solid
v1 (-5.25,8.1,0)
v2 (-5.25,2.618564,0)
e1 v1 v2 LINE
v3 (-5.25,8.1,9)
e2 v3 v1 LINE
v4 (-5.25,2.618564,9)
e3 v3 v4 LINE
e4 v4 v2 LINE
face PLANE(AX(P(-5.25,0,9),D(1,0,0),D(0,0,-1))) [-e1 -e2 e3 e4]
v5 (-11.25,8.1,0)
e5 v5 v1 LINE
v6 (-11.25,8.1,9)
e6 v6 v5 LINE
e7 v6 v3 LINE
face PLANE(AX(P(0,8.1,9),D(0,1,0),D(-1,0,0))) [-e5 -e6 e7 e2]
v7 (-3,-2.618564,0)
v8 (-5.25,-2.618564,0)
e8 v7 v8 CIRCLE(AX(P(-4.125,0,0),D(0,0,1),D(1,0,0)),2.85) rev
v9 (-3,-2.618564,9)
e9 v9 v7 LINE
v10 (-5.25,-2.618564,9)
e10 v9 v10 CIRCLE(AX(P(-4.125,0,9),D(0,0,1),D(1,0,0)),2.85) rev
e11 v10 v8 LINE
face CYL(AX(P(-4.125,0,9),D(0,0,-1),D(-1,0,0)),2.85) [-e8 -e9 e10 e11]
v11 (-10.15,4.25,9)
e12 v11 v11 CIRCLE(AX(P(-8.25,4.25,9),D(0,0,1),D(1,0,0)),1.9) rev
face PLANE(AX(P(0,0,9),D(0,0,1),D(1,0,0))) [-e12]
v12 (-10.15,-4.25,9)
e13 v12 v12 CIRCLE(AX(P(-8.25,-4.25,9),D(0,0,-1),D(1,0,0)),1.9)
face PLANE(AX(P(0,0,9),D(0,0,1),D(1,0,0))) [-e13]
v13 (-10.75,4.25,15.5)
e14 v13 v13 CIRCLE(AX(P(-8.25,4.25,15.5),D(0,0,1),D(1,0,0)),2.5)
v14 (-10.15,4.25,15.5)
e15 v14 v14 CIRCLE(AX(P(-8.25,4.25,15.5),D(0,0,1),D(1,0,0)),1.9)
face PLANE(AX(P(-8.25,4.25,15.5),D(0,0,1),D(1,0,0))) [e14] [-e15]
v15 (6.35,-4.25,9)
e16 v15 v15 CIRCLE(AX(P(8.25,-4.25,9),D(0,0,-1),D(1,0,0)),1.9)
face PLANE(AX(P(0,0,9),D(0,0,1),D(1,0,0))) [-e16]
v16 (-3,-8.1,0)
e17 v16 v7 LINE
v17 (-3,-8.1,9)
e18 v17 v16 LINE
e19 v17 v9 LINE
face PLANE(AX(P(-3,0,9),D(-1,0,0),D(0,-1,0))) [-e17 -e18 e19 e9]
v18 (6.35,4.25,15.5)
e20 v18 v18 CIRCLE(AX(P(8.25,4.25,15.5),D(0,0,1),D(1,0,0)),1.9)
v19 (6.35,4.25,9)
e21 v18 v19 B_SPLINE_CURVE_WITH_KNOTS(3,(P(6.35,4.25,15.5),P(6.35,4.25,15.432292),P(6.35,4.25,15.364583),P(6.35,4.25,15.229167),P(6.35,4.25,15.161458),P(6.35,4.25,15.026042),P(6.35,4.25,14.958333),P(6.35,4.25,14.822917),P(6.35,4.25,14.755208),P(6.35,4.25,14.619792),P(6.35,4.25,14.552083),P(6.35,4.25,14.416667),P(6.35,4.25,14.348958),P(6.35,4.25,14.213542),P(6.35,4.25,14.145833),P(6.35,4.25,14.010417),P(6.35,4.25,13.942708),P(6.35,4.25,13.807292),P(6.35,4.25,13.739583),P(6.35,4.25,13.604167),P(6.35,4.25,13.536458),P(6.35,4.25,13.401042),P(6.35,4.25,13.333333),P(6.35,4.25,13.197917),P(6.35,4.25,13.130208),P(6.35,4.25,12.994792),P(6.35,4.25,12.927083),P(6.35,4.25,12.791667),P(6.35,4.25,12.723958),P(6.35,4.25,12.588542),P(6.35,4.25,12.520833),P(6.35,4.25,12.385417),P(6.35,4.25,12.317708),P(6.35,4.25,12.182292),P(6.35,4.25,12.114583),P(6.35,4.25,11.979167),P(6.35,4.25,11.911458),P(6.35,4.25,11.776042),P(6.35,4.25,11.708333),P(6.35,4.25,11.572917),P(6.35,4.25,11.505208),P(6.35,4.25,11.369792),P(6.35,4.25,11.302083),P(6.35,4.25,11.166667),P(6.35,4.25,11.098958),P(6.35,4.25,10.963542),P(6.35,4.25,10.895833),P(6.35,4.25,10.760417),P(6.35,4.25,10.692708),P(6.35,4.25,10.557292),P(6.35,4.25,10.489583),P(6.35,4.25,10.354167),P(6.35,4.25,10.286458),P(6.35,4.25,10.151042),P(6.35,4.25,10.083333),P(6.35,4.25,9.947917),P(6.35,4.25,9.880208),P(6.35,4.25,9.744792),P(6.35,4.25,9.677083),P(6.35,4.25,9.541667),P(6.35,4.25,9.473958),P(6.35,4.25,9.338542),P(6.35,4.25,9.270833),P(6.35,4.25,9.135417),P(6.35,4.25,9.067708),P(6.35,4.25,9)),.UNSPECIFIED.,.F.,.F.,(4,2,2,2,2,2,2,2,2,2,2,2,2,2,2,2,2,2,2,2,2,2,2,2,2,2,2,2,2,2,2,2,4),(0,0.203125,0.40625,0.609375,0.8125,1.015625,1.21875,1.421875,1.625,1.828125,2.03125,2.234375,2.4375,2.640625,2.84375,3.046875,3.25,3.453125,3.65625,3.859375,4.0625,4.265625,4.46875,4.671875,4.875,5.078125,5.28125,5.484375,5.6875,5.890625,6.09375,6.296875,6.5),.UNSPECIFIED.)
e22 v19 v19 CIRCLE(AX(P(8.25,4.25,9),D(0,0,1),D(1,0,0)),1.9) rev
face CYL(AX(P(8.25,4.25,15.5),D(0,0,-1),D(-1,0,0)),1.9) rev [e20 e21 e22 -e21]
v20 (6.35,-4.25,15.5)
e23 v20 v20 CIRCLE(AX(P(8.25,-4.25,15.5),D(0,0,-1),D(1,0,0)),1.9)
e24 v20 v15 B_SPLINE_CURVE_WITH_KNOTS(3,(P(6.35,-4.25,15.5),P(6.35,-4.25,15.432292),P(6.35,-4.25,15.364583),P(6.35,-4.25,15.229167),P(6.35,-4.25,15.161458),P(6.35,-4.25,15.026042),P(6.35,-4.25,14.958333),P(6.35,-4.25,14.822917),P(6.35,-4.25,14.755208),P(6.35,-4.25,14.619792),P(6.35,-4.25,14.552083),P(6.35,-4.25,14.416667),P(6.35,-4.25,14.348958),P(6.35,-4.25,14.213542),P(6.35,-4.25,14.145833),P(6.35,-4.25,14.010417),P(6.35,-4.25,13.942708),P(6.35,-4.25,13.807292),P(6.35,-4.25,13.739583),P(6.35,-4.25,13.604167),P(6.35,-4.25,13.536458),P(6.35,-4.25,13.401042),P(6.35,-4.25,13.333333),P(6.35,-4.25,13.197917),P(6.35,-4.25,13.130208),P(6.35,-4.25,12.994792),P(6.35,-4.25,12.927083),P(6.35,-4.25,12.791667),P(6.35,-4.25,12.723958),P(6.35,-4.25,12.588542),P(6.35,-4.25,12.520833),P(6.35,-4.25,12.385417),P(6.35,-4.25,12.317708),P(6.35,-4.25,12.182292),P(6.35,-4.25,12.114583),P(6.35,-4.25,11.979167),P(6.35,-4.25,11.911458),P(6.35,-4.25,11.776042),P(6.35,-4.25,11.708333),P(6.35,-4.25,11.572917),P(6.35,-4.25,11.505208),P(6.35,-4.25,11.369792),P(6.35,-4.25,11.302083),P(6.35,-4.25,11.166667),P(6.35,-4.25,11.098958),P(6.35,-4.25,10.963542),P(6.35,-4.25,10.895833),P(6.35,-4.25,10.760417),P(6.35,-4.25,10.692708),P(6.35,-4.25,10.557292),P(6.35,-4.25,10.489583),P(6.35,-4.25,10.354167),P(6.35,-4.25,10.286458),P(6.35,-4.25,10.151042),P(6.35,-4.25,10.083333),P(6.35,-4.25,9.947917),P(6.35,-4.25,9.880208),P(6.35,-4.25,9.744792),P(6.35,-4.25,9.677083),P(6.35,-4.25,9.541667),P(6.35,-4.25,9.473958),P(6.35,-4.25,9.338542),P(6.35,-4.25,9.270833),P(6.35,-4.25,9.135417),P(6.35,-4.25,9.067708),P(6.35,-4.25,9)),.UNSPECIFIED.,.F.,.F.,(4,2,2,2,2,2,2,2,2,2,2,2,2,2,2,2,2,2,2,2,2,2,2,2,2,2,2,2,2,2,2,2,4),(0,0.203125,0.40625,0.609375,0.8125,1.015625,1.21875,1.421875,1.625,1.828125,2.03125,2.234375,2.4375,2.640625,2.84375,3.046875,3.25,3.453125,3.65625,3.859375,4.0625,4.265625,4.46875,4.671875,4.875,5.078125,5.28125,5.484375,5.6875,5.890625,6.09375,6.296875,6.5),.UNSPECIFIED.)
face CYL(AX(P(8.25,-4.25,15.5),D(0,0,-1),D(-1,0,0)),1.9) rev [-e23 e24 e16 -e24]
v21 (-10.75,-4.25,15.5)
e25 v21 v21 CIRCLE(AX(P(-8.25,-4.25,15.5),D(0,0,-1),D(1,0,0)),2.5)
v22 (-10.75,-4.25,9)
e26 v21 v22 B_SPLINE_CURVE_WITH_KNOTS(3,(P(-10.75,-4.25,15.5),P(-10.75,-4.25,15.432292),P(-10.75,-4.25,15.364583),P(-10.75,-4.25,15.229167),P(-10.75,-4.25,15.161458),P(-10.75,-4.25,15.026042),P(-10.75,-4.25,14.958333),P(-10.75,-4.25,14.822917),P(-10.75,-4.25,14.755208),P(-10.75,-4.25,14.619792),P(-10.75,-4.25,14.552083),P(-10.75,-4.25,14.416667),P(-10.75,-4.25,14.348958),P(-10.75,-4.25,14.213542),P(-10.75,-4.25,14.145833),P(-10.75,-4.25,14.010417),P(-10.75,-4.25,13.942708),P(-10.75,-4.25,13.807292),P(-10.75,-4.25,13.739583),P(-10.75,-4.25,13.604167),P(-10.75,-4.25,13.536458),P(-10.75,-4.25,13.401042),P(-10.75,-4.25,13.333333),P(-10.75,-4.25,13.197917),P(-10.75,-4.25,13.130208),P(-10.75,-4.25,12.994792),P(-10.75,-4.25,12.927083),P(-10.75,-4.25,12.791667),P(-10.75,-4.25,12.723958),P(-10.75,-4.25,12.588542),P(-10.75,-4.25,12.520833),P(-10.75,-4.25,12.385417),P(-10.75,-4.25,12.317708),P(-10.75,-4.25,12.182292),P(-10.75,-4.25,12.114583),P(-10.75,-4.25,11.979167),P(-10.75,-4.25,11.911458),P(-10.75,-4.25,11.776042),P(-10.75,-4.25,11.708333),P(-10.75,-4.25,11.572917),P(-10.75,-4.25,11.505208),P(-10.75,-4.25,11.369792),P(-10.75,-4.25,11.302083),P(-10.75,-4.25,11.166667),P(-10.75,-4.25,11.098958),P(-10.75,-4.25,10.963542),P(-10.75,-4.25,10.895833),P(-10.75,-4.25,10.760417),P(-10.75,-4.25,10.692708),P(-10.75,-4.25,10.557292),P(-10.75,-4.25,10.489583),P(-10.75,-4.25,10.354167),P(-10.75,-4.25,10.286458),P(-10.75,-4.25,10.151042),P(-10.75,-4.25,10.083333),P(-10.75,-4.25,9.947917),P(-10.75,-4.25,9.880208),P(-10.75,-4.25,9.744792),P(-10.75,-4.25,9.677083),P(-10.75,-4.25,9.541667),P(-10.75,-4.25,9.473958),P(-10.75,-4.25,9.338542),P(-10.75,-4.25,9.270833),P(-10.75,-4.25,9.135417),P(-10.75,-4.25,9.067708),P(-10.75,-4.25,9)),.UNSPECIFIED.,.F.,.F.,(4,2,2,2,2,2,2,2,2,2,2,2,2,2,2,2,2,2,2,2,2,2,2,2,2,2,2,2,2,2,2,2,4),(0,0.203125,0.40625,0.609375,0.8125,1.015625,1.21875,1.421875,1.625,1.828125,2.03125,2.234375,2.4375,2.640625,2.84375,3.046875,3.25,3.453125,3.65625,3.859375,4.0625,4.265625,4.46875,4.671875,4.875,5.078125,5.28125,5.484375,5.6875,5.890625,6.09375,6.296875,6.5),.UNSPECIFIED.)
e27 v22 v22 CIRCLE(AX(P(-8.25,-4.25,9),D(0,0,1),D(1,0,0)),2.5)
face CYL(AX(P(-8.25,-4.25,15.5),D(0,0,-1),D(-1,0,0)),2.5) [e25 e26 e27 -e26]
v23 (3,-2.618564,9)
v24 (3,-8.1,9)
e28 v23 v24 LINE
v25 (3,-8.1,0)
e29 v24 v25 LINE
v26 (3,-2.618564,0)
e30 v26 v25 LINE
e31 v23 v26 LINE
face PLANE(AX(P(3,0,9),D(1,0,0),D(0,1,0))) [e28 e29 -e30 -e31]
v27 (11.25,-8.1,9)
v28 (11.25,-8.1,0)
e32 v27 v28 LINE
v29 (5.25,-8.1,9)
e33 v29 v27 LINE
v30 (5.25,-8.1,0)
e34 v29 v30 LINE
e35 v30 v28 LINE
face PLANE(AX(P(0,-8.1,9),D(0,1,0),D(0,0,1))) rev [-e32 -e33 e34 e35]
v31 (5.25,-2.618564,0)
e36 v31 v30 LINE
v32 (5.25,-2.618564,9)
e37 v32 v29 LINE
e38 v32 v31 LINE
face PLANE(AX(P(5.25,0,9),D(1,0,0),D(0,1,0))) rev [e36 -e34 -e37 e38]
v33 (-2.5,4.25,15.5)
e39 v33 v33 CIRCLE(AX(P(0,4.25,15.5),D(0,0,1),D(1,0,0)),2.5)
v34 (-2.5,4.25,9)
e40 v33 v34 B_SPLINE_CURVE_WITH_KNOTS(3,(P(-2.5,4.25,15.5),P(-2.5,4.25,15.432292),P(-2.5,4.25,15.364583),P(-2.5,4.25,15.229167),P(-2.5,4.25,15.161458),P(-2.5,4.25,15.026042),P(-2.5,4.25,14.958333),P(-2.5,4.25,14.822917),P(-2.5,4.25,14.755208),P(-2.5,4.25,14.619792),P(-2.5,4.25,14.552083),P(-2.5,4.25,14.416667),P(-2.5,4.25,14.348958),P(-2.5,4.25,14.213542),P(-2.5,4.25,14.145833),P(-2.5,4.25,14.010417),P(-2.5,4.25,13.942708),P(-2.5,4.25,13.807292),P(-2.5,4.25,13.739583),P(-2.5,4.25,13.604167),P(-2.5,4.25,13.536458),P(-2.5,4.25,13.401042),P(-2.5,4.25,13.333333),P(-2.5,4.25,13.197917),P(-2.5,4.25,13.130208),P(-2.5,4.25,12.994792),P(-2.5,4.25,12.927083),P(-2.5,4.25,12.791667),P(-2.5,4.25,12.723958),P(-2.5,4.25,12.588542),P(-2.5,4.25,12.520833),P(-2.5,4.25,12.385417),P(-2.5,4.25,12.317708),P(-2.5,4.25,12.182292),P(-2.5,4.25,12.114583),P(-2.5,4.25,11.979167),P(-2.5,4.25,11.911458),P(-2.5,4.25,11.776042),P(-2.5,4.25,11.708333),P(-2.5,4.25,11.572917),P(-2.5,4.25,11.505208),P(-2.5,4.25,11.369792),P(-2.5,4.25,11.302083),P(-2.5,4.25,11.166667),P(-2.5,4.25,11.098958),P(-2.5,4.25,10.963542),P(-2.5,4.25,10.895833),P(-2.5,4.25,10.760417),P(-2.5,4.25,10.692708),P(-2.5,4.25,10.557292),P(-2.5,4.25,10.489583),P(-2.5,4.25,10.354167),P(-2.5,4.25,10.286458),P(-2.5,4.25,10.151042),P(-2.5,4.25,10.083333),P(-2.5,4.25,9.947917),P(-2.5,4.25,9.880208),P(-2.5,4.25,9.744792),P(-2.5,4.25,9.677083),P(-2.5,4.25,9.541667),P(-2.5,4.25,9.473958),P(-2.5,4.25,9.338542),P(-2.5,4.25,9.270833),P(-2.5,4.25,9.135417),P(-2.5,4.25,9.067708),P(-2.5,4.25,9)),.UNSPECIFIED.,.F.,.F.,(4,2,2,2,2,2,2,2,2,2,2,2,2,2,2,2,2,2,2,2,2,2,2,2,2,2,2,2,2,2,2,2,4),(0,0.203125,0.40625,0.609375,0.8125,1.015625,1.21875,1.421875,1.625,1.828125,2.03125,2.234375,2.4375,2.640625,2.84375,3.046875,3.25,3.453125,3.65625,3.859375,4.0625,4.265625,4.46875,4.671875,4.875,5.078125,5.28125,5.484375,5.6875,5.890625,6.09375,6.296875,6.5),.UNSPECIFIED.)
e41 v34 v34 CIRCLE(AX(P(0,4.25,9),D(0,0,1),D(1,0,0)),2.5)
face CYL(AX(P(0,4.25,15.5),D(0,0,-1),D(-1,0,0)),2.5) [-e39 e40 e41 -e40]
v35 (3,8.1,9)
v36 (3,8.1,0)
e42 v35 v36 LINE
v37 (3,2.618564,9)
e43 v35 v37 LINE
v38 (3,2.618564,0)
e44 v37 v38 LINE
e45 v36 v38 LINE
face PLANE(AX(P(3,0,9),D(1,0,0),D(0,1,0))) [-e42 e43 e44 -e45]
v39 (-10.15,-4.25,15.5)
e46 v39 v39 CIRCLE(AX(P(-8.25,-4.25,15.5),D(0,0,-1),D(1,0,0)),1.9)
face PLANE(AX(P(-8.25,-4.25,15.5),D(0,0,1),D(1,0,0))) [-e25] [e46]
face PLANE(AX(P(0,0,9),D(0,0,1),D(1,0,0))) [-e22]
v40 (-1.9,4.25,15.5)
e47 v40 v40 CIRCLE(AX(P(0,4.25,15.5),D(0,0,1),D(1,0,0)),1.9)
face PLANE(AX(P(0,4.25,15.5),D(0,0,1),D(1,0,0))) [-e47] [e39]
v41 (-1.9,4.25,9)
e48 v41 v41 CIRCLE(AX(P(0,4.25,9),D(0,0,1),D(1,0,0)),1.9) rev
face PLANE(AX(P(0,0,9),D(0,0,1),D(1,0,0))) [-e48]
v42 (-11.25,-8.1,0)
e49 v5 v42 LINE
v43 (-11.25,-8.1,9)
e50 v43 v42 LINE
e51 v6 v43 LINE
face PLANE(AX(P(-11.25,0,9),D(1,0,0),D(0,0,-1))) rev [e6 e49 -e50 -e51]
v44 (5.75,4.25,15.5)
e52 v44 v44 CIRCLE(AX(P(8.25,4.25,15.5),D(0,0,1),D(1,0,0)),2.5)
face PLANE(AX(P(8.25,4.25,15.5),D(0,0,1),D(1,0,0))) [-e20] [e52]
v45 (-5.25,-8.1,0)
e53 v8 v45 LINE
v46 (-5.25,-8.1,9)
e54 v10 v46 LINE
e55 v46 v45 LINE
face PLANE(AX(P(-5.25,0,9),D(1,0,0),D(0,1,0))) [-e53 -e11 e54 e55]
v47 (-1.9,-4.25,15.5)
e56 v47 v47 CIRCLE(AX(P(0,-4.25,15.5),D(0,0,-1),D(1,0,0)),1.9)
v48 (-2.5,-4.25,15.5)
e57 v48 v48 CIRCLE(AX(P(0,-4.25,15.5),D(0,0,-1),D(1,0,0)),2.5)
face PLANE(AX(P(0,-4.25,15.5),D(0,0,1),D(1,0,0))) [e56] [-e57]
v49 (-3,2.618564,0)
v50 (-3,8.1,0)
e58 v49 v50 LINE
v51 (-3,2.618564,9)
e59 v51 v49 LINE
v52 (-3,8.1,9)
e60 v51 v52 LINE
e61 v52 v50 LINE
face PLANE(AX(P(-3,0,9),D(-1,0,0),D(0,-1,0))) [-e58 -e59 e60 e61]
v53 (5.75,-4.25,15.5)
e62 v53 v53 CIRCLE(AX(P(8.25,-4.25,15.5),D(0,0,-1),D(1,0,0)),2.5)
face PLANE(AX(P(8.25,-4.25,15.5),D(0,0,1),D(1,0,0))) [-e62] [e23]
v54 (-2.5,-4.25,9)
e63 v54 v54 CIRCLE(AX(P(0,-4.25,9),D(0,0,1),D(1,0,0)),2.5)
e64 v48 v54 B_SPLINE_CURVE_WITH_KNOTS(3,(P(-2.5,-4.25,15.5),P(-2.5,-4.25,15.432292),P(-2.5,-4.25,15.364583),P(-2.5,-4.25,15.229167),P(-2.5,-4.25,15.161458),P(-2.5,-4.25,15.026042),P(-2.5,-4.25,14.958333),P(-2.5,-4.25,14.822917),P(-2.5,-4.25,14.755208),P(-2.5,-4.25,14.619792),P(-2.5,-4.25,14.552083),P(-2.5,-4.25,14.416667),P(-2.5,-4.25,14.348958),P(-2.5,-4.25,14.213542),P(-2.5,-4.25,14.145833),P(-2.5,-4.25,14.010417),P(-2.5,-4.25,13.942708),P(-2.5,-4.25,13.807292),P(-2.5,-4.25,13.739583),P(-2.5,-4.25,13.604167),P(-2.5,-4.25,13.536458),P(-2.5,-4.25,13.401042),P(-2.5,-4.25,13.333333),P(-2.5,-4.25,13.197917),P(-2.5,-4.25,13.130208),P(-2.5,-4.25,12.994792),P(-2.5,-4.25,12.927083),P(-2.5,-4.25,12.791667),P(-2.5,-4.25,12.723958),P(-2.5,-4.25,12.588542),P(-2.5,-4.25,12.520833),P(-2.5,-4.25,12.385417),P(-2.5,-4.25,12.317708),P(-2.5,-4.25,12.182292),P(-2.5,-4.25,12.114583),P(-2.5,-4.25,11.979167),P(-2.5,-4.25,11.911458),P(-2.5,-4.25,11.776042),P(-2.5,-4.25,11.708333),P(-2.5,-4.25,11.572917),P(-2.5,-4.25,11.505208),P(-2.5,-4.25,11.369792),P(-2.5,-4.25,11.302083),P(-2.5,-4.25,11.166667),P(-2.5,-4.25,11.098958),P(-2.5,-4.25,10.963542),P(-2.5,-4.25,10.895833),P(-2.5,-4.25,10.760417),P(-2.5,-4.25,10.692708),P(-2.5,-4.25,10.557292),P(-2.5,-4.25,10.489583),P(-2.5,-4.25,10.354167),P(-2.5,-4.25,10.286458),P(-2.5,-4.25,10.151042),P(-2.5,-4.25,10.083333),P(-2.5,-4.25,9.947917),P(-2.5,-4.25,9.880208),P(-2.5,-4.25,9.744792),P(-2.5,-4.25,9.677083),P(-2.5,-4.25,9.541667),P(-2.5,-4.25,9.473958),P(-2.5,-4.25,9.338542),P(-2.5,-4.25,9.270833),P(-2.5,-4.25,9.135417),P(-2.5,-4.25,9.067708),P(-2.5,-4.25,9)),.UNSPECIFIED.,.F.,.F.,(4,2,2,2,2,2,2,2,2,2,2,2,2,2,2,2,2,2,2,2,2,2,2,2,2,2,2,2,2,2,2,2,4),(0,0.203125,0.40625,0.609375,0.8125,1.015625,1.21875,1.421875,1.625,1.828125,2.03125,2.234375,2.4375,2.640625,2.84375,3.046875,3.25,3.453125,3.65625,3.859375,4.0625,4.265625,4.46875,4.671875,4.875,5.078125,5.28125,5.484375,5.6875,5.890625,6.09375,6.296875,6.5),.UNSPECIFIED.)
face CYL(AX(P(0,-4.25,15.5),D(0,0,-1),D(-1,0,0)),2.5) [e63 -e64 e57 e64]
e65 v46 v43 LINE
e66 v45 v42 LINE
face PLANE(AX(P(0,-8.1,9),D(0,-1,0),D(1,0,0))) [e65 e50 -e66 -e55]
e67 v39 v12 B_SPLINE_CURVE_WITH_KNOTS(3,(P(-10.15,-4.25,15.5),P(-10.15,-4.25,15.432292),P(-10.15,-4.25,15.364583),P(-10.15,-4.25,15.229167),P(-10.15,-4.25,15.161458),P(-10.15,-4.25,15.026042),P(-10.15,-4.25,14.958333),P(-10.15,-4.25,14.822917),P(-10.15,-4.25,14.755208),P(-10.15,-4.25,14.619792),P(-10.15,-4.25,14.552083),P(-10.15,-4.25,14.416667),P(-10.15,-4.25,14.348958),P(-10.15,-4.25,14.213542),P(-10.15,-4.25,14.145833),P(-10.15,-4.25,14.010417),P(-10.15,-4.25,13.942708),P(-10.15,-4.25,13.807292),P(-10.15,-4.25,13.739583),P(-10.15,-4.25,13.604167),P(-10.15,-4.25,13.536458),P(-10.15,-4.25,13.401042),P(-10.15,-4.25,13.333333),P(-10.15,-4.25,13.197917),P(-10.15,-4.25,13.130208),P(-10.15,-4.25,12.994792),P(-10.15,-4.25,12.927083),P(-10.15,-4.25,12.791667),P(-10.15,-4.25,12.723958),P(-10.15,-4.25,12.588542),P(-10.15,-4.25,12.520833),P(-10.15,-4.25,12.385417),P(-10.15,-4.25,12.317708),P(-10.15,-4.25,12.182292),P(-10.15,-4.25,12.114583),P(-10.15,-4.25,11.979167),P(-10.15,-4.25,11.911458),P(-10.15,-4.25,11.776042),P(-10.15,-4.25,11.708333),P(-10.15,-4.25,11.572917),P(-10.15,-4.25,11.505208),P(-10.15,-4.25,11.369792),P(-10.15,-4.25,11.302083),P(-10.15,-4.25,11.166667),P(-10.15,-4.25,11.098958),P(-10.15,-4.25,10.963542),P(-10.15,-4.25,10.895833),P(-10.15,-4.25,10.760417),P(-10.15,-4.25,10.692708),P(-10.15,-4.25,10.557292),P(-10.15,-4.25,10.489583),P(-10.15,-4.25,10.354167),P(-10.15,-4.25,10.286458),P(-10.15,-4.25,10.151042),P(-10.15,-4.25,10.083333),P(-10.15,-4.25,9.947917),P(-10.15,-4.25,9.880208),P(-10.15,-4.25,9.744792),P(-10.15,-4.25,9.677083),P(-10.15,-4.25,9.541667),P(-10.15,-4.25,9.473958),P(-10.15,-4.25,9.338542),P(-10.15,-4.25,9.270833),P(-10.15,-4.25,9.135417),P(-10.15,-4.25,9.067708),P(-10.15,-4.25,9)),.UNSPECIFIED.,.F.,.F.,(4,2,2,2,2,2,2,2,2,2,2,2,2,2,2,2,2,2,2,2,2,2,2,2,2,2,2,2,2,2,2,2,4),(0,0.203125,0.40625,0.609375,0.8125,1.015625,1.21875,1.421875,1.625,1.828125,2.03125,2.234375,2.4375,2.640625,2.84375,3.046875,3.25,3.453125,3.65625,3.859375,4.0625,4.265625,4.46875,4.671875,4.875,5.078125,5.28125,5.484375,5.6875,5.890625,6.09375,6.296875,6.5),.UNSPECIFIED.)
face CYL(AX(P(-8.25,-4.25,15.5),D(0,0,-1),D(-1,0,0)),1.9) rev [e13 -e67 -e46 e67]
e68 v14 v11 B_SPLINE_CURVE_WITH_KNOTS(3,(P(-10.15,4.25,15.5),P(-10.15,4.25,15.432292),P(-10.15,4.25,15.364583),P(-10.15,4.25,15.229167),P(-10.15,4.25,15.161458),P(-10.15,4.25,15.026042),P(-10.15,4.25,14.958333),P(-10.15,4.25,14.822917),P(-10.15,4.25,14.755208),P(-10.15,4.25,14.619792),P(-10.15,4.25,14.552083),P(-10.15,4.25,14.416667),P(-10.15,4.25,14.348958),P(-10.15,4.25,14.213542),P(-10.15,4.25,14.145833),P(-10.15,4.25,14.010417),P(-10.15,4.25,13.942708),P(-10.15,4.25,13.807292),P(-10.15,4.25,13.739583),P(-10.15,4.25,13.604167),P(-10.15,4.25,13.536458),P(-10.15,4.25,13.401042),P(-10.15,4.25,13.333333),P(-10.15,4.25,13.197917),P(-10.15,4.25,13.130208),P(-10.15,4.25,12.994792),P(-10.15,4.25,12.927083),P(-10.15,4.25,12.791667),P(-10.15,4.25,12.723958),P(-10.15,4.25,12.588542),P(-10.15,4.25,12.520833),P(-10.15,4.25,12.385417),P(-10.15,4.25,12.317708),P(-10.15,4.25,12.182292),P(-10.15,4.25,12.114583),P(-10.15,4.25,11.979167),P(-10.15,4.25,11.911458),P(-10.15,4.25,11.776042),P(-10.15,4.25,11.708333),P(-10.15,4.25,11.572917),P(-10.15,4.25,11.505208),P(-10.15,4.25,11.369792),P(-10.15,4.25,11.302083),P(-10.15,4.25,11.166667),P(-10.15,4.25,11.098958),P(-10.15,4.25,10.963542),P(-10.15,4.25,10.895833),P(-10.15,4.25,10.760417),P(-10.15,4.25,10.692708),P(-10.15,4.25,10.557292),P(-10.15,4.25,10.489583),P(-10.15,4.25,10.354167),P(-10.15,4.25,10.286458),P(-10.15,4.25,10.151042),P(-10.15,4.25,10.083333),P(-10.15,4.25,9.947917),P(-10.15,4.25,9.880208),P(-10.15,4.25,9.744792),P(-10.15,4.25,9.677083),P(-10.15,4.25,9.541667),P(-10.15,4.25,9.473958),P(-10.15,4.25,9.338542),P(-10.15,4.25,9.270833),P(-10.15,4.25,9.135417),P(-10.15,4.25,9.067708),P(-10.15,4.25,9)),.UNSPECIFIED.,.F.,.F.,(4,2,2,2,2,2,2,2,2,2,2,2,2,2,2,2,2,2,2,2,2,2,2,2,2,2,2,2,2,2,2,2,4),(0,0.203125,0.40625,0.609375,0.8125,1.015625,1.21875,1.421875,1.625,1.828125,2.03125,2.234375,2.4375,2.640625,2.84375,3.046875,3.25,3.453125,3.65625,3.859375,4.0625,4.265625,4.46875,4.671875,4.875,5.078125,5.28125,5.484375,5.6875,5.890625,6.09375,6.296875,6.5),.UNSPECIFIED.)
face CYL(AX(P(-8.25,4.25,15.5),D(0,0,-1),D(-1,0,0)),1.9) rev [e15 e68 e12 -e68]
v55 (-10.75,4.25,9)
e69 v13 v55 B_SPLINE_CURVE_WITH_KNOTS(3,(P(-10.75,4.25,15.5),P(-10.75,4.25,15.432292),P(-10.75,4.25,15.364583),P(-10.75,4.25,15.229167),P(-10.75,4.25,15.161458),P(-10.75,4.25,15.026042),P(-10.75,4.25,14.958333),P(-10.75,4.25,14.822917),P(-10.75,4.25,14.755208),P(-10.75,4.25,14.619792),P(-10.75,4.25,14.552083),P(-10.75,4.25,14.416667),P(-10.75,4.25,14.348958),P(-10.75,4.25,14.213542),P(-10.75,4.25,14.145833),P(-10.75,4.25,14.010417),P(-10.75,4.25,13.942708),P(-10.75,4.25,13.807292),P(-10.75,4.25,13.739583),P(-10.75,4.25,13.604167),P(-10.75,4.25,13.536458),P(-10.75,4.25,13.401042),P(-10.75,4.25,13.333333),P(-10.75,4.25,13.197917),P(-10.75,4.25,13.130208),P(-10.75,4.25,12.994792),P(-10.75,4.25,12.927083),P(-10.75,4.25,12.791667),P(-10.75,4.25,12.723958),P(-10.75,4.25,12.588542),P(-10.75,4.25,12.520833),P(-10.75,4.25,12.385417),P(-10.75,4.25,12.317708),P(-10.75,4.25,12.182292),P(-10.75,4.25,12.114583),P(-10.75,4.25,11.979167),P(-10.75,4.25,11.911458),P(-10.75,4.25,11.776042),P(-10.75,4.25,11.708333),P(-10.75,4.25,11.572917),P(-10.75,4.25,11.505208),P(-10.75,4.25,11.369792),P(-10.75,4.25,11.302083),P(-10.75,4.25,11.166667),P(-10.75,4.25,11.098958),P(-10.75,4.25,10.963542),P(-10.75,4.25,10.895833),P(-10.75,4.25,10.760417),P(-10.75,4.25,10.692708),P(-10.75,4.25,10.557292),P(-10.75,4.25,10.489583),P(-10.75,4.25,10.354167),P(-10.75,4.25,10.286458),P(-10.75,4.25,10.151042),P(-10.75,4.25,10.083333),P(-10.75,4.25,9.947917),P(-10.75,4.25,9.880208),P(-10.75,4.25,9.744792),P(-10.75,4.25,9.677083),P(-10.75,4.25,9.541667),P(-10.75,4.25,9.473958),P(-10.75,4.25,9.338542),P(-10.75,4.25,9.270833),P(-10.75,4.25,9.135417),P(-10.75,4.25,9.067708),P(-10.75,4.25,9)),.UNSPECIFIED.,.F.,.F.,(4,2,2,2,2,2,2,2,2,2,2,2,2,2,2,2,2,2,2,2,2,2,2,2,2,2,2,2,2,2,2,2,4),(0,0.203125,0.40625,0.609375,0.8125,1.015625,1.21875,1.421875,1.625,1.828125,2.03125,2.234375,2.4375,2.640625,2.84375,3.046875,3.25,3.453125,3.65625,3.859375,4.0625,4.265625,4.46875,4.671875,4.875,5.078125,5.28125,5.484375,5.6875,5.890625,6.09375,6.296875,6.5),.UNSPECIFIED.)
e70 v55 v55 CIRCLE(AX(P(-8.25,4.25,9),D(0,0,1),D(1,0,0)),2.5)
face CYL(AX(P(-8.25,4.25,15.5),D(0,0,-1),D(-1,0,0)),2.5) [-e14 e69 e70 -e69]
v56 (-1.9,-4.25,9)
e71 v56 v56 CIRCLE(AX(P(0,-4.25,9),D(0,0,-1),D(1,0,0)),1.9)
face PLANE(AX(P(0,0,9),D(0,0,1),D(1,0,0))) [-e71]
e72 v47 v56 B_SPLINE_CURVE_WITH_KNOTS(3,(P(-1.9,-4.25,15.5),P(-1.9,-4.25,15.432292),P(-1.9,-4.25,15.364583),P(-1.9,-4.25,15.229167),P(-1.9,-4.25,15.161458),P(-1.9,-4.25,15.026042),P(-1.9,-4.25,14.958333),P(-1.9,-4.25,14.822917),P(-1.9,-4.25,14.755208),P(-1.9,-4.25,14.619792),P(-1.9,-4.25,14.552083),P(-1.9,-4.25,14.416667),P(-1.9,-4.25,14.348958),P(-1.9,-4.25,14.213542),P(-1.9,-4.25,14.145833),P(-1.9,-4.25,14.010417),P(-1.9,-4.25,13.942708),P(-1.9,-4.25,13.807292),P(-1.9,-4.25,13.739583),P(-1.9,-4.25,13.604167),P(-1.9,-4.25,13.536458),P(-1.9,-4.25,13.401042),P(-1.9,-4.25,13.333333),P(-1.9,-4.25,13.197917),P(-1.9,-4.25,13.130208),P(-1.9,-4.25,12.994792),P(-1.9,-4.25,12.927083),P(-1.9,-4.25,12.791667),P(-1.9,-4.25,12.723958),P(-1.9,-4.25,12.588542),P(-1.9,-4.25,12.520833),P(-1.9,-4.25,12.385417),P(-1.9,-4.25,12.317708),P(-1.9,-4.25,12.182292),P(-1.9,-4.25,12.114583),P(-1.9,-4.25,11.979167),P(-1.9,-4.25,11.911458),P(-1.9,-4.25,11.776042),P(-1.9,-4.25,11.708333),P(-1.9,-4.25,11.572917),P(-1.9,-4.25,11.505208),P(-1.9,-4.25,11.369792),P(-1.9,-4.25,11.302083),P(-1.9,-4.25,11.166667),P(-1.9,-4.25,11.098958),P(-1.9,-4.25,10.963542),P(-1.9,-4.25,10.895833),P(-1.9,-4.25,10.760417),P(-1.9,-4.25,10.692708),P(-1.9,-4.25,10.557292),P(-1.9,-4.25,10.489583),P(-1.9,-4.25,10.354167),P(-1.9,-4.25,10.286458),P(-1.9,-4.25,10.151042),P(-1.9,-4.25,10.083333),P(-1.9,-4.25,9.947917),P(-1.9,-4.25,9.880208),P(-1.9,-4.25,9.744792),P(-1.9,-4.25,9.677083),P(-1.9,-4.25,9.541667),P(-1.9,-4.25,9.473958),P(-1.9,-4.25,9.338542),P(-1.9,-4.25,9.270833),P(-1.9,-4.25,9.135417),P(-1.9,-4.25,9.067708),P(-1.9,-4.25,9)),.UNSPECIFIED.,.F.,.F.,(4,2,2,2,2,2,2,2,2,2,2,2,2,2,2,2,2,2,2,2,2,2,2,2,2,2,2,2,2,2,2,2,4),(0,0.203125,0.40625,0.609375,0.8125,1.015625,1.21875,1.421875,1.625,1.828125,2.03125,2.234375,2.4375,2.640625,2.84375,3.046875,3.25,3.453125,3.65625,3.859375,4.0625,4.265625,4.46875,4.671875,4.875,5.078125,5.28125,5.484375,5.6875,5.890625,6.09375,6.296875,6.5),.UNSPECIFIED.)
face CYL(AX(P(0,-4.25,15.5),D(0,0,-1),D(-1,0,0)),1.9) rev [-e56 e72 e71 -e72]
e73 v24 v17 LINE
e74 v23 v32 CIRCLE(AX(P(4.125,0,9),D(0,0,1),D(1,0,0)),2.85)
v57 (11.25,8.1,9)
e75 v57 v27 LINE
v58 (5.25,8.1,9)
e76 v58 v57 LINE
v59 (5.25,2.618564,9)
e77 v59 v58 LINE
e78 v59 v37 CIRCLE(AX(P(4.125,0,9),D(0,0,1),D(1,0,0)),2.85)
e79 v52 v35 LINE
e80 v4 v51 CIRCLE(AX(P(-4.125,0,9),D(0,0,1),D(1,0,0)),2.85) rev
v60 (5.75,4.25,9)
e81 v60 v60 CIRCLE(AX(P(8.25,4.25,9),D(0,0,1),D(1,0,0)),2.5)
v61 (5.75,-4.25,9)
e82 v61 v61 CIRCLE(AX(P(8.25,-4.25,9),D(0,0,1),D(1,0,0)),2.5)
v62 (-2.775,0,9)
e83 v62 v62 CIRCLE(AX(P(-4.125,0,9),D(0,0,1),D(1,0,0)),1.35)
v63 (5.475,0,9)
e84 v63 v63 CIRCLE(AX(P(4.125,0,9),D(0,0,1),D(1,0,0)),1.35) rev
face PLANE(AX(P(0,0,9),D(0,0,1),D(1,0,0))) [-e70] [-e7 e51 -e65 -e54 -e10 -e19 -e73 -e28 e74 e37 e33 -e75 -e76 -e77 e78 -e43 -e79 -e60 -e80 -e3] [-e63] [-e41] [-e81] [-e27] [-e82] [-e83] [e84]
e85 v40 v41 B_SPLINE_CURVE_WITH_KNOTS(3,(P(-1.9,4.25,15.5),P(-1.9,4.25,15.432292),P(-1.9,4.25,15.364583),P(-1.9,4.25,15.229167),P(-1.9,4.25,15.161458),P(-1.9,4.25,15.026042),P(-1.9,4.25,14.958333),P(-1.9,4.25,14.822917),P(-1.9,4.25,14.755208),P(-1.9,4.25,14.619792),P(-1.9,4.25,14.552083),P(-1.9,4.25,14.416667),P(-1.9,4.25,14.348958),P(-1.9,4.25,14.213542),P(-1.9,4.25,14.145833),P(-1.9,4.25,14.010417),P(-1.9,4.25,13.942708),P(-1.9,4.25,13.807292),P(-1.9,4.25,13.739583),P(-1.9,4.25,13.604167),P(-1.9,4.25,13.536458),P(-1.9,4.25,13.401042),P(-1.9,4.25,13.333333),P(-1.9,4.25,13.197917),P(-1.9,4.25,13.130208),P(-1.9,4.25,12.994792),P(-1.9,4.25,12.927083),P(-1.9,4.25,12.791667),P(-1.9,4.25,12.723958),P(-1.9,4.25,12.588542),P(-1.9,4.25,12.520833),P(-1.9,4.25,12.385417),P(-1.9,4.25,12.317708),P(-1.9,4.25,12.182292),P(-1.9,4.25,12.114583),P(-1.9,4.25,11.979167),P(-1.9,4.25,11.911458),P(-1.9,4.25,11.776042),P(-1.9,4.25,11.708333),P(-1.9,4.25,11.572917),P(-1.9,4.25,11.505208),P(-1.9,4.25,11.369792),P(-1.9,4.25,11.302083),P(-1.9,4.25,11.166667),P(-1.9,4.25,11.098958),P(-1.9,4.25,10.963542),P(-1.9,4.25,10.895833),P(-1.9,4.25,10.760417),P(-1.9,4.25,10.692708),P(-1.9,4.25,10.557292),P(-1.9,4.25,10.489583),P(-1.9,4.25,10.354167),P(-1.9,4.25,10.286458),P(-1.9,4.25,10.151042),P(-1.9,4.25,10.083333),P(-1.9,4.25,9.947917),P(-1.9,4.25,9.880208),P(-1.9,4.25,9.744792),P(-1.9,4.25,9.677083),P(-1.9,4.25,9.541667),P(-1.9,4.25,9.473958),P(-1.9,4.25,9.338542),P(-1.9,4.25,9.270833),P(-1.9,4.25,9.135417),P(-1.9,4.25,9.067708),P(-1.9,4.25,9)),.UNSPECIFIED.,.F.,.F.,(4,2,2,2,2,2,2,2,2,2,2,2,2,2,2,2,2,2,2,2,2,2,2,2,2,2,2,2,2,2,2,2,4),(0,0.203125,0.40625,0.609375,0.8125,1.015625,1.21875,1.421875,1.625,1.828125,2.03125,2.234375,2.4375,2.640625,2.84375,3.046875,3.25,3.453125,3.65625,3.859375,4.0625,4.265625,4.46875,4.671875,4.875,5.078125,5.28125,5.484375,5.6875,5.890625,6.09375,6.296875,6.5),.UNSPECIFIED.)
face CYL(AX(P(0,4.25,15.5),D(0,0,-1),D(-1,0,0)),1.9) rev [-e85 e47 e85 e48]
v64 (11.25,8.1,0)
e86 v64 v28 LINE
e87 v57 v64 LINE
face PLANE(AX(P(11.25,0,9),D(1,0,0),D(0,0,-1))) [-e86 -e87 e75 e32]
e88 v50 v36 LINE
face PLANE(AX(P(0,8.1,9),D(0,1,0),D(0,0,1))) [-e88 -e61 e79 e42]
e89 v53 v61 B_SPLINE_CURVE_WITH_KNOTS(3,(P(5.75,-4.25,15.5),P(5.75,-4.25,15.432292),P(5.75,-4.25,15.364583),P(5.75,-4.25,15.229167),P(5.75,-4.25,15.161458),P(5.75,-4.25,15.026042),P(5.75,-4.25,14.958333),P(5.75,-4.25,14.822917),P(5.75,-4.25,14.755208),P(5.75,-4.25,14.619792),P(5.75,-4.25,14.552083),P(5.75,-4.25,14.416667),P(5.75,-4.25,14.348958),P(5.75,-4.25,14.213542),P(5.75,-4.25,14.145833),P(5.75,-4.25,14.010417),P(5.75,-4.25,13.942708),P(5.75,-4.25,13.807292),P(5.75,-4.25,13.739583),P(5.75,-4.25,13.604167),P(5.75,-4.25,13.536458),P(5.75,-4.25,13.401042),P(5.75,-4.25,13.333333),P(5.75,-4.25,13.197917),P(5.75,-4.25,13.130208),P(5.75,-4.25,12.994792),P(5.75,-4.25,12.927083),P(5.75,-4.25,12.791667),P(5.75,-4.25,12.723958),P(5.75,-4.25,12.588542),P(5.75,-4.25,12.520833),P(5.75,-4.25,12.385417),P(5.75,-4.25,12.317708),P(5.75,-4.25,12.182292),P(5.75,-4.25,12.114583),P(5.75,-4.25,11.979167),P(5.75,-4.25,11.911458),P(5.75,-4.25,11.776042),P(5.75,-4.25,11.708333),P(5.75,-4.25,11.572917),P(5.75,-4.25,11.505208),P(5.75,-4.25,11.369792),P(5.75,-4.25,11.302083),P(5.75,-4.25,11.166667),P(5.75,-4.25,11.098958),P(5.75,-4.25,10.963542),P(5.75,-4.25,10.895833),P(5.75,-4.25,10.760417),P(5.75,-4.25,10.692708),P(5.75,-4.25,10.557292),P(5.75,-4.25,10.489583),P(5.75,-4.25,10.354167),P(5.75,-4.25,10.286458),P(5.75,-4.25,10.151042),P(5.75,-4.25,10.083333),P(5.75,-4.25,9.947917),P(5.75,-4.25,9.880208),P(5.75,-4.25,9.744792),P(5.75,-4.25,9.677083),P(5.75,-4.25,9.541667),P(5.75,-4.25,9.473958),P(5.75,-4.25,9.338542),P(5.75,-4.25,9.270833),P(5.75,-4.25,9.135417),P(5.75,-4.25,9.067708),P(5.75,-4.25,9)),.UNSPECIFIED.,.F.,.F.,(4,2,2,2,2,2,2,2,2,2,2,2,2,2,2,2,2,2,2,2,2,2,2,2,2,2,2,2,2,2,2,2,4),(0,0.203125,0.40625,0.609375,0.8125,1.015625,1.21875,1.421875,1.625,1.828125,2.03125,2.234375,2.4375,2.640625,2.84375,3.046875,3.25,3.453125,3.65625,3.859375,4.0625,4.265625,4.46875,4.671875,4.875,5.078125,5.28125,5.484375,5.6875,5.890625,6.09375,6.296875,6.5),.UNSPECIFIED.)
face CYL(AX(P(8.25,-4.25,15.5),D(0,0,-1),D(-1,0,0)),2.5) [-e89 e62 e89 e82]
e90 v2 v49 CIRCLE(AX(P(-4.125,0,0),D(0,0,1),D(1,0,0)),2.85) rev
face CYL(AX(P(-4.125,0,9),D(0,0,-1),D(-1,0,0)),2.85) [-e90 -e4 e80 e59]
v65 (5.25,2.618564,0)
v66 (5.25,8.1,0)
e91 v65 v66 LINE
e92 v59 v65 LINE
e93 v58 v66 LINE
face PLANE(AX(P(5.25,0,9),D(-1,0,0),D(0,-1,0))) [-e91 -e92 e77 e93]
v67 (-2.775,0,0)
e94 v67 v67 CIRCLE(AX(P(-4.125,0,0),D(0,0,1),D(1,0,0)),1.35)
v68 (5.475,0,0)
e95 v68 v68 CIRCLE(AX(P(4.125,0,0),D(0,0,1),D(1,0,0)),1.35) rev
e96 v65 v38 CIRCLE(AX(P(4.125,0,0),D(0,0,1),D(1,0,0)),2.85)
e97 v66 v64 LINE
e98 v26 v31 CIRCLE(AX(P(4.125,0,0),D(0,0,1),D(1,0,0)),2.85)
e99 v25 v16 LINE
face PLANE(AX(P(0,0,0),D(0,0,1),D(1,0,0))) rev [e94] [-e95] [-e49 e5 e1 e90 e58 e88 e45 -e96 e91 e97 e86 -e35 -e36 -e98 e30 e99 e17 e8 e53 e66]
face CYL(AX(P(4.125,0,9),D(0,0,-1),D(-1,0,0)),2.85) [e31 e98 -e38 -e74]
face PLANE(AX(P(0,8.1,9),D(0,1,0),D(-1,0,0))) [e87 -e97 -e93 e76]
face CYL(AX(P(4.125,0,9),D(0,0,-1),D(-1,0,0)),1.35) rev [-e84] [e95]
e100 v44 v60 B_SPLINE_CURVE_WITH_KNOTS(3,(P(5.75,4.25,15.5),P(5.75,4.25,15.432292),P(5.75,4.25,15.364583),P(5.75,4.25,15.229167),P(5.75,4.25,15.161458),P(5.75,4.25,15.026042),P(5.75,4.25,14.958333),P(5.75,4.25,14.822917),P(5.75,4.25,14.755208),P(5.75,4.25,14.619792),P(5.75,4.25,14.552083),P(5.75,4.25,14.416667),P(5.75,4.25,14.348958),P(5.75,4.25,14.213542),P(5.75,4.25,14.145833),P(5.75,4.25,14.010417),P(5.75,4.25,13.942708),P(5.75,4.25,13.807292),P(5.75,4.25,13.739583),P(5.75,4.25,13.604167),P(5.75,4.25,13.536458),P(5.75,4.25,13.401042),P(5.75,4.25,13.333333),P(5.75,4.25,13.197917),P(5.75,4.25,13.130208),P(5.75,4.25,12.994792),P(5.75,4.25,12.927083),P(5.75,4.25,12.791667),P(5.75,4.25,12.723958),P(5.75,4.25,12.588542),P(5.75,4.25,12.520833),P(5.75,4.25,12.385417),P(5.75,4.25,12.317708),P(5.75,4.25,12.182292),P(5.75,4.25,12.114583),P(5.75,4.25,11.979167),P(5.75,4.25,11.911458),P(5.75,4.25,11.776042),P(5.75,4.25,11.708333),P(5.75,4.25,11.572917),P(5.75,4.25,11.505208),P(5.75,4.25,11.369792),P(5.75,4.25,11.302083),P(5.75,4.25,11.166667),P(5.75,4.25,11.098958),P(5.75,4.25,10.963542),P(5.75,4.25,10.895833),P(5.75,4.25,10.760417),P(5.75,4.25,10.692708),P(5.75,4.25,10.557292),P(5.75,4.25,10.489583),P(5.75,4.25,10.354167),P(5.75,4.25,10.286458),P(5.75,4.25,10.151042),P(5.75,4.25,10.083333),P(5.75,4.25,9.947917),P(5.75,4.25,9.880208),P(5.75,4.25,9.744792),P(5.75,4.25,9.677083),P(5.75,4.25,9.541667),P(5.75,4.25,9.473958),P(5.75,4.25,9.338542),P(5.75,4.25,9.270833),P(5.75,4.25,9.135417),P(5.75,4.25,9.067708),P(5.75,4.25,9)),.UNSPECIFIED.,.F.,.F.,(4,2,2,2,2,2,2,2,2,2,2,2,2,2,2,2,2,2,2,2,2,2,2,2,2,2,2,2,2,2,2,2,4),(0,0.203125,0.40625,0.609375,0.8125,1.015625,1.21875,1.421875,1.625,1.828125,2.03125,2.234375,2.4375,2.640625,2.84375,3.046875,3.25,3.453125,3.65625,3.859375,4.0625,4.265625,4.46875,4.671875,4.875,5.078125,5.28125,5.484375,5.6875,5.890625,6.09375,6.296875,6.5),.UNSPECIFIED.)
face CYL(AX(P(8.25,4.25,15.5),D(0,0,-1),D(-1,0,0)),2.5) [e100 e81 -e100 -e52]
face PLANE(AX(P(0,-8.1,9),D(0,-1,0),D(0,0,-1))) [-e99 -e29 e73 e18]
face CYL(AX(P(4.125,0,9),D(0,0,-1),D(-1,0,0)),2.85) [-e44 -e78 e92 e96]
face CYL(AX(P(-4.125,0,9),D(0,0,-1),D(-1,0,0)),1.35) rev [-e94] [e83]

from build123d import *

# Parameters (mm, degrees)
SKETCH1_R               = 1.35
BOSS_EXTRUDE1_DEPTH     = 9
SKETCH2_R               = 2.5
SKETCH2_R_2             = 1.9
BOSS_EXTRUDE2_DEPTH     = 6.5
CRVPATTERN1_START       = 9
CRVPATTERN1_OUTLINE_R   = 2.5
CRVPATTERN1_OUTLINE_R_2 = 1.9
CRVPATTERN1_DEPTH       = 6.5


# Read off the part's stored shape, not the designer's step: CrvPattern1
with BuildPart() as part:
    # Sketch1 → Boss-Extrude1 (new body)
    with BuildSketch(Plane.XY):
        with BuildLine():
            Line((11.25, 8.1), (11.25, -8.1))
            Line((11.25, -8.1), (5.25, -8.1))
            Line((5.25, -8.1), (5.25, -2.618563538))
            ThreePointArc((5.25, -2.618563538), (4.125, -2.85), (3, -2.618563538))
            Line((3, -2.618563538), (3, -8.1))
            Line((3, -8.1), (-3, -8.1))
            Line((-3, -8.1), (-3, -2.618563538))
            ThreePointArc((-3, -2.618563538), (-4.125, -2.85), (-5.25, -2.618563538))
            Line((-5.25, -2.618563538), (-5.25, -8.1))
            Line((-5.25, -8.1), (-11.25, -8.1))
            Line((-11.25, -8.1), (-11.25, 8.1))
            Line((-11.25, 8.1), (-5.25, 8.1))
            Line((-5.25, 8.1), (-5.25, 2.618563538))
            ThreePointArc((-5.25, 2.618563538), (-4.125, 2.85), (-3, 2.618563538))
            Line((-3, 2.618563538), (-3, 8.1))
            Line((-3, 8.1), (3, 8.1))
            Line((3, 8.1), (3, 2.618563538))
            ThreePointArc((3, 2.618563538), (4.125, 2.85), (5.25, 2.618563538))
            Line((5.25, 2.618563538), (5.25, 8.1))
            Line((5.25, 8.1), (11.25, 8.1))
        make_face()
        with Locations((-4.125, 0)):
            Circle(SKETCH1_R, mode=Mode.SUBTRACT)
        with Locations((4.125, 0)):
            Circle(SKETCH1_R, mode=Mode.SUBTRACT)
    extrude(amount=BOSS_EXTRUDE1_DEPTH)

    # Sketch2 → Boss-Extrude2 (add)
    with BuildSketch(Plane.XY.offset(9)):
        with Locations(Location((0, 4.25, 0), (0, 0, 180))):
            Circle(SKETCH2_R)
        with Locations(Location((0, 4.25, 0), (0, 0, 180))):
            Circle(SKETCH2_R_2, mode=Mode.SUBTRACT)
    boss_extrude2 = extrude(amount=BOSS_EXTRUDE2_DEPTH)

    # CrvPattern1 outline → CrvPattern1 (add)
    # profile 1 of 2: a face of its own
    with BuildSketch(Plane.XY.offset(CRVPATTERN1_START)):
        with Locations((8.25, 4.25)):
            Circle(CRVPATTERN1_OUTLINE_R)
        with Locations((8.25, 4.25)):
            Circle(CRVPATTERN1_OUTLINE_R_2, mode=Mode.SUBTRACT)
    # profile 2 of 2: a face of its own
    with BuildSketch(Plane.XY.offset(CRVPATTERN1_START)):
        with Locations((-8.25, 4.25)):
            Circle(CRVPATTERN1_OUTLINE_R)
        with Locations((-8.25, 4.25)):
            Circle(CRVPATTERN1_OUTLINE_R_2, mode=Mode.SUBTRACT)
    crvpattern1 = extrude(amount=CRVPATTERN1_DEPTH)

    # Mirror1: Boss-Extrude2, CrvPattern1 across plane
    add(boss_extrude2.mirror(Plane.ZX))
    add(crvpattern1.mirror(Plane.ZX))


solid = part.part
